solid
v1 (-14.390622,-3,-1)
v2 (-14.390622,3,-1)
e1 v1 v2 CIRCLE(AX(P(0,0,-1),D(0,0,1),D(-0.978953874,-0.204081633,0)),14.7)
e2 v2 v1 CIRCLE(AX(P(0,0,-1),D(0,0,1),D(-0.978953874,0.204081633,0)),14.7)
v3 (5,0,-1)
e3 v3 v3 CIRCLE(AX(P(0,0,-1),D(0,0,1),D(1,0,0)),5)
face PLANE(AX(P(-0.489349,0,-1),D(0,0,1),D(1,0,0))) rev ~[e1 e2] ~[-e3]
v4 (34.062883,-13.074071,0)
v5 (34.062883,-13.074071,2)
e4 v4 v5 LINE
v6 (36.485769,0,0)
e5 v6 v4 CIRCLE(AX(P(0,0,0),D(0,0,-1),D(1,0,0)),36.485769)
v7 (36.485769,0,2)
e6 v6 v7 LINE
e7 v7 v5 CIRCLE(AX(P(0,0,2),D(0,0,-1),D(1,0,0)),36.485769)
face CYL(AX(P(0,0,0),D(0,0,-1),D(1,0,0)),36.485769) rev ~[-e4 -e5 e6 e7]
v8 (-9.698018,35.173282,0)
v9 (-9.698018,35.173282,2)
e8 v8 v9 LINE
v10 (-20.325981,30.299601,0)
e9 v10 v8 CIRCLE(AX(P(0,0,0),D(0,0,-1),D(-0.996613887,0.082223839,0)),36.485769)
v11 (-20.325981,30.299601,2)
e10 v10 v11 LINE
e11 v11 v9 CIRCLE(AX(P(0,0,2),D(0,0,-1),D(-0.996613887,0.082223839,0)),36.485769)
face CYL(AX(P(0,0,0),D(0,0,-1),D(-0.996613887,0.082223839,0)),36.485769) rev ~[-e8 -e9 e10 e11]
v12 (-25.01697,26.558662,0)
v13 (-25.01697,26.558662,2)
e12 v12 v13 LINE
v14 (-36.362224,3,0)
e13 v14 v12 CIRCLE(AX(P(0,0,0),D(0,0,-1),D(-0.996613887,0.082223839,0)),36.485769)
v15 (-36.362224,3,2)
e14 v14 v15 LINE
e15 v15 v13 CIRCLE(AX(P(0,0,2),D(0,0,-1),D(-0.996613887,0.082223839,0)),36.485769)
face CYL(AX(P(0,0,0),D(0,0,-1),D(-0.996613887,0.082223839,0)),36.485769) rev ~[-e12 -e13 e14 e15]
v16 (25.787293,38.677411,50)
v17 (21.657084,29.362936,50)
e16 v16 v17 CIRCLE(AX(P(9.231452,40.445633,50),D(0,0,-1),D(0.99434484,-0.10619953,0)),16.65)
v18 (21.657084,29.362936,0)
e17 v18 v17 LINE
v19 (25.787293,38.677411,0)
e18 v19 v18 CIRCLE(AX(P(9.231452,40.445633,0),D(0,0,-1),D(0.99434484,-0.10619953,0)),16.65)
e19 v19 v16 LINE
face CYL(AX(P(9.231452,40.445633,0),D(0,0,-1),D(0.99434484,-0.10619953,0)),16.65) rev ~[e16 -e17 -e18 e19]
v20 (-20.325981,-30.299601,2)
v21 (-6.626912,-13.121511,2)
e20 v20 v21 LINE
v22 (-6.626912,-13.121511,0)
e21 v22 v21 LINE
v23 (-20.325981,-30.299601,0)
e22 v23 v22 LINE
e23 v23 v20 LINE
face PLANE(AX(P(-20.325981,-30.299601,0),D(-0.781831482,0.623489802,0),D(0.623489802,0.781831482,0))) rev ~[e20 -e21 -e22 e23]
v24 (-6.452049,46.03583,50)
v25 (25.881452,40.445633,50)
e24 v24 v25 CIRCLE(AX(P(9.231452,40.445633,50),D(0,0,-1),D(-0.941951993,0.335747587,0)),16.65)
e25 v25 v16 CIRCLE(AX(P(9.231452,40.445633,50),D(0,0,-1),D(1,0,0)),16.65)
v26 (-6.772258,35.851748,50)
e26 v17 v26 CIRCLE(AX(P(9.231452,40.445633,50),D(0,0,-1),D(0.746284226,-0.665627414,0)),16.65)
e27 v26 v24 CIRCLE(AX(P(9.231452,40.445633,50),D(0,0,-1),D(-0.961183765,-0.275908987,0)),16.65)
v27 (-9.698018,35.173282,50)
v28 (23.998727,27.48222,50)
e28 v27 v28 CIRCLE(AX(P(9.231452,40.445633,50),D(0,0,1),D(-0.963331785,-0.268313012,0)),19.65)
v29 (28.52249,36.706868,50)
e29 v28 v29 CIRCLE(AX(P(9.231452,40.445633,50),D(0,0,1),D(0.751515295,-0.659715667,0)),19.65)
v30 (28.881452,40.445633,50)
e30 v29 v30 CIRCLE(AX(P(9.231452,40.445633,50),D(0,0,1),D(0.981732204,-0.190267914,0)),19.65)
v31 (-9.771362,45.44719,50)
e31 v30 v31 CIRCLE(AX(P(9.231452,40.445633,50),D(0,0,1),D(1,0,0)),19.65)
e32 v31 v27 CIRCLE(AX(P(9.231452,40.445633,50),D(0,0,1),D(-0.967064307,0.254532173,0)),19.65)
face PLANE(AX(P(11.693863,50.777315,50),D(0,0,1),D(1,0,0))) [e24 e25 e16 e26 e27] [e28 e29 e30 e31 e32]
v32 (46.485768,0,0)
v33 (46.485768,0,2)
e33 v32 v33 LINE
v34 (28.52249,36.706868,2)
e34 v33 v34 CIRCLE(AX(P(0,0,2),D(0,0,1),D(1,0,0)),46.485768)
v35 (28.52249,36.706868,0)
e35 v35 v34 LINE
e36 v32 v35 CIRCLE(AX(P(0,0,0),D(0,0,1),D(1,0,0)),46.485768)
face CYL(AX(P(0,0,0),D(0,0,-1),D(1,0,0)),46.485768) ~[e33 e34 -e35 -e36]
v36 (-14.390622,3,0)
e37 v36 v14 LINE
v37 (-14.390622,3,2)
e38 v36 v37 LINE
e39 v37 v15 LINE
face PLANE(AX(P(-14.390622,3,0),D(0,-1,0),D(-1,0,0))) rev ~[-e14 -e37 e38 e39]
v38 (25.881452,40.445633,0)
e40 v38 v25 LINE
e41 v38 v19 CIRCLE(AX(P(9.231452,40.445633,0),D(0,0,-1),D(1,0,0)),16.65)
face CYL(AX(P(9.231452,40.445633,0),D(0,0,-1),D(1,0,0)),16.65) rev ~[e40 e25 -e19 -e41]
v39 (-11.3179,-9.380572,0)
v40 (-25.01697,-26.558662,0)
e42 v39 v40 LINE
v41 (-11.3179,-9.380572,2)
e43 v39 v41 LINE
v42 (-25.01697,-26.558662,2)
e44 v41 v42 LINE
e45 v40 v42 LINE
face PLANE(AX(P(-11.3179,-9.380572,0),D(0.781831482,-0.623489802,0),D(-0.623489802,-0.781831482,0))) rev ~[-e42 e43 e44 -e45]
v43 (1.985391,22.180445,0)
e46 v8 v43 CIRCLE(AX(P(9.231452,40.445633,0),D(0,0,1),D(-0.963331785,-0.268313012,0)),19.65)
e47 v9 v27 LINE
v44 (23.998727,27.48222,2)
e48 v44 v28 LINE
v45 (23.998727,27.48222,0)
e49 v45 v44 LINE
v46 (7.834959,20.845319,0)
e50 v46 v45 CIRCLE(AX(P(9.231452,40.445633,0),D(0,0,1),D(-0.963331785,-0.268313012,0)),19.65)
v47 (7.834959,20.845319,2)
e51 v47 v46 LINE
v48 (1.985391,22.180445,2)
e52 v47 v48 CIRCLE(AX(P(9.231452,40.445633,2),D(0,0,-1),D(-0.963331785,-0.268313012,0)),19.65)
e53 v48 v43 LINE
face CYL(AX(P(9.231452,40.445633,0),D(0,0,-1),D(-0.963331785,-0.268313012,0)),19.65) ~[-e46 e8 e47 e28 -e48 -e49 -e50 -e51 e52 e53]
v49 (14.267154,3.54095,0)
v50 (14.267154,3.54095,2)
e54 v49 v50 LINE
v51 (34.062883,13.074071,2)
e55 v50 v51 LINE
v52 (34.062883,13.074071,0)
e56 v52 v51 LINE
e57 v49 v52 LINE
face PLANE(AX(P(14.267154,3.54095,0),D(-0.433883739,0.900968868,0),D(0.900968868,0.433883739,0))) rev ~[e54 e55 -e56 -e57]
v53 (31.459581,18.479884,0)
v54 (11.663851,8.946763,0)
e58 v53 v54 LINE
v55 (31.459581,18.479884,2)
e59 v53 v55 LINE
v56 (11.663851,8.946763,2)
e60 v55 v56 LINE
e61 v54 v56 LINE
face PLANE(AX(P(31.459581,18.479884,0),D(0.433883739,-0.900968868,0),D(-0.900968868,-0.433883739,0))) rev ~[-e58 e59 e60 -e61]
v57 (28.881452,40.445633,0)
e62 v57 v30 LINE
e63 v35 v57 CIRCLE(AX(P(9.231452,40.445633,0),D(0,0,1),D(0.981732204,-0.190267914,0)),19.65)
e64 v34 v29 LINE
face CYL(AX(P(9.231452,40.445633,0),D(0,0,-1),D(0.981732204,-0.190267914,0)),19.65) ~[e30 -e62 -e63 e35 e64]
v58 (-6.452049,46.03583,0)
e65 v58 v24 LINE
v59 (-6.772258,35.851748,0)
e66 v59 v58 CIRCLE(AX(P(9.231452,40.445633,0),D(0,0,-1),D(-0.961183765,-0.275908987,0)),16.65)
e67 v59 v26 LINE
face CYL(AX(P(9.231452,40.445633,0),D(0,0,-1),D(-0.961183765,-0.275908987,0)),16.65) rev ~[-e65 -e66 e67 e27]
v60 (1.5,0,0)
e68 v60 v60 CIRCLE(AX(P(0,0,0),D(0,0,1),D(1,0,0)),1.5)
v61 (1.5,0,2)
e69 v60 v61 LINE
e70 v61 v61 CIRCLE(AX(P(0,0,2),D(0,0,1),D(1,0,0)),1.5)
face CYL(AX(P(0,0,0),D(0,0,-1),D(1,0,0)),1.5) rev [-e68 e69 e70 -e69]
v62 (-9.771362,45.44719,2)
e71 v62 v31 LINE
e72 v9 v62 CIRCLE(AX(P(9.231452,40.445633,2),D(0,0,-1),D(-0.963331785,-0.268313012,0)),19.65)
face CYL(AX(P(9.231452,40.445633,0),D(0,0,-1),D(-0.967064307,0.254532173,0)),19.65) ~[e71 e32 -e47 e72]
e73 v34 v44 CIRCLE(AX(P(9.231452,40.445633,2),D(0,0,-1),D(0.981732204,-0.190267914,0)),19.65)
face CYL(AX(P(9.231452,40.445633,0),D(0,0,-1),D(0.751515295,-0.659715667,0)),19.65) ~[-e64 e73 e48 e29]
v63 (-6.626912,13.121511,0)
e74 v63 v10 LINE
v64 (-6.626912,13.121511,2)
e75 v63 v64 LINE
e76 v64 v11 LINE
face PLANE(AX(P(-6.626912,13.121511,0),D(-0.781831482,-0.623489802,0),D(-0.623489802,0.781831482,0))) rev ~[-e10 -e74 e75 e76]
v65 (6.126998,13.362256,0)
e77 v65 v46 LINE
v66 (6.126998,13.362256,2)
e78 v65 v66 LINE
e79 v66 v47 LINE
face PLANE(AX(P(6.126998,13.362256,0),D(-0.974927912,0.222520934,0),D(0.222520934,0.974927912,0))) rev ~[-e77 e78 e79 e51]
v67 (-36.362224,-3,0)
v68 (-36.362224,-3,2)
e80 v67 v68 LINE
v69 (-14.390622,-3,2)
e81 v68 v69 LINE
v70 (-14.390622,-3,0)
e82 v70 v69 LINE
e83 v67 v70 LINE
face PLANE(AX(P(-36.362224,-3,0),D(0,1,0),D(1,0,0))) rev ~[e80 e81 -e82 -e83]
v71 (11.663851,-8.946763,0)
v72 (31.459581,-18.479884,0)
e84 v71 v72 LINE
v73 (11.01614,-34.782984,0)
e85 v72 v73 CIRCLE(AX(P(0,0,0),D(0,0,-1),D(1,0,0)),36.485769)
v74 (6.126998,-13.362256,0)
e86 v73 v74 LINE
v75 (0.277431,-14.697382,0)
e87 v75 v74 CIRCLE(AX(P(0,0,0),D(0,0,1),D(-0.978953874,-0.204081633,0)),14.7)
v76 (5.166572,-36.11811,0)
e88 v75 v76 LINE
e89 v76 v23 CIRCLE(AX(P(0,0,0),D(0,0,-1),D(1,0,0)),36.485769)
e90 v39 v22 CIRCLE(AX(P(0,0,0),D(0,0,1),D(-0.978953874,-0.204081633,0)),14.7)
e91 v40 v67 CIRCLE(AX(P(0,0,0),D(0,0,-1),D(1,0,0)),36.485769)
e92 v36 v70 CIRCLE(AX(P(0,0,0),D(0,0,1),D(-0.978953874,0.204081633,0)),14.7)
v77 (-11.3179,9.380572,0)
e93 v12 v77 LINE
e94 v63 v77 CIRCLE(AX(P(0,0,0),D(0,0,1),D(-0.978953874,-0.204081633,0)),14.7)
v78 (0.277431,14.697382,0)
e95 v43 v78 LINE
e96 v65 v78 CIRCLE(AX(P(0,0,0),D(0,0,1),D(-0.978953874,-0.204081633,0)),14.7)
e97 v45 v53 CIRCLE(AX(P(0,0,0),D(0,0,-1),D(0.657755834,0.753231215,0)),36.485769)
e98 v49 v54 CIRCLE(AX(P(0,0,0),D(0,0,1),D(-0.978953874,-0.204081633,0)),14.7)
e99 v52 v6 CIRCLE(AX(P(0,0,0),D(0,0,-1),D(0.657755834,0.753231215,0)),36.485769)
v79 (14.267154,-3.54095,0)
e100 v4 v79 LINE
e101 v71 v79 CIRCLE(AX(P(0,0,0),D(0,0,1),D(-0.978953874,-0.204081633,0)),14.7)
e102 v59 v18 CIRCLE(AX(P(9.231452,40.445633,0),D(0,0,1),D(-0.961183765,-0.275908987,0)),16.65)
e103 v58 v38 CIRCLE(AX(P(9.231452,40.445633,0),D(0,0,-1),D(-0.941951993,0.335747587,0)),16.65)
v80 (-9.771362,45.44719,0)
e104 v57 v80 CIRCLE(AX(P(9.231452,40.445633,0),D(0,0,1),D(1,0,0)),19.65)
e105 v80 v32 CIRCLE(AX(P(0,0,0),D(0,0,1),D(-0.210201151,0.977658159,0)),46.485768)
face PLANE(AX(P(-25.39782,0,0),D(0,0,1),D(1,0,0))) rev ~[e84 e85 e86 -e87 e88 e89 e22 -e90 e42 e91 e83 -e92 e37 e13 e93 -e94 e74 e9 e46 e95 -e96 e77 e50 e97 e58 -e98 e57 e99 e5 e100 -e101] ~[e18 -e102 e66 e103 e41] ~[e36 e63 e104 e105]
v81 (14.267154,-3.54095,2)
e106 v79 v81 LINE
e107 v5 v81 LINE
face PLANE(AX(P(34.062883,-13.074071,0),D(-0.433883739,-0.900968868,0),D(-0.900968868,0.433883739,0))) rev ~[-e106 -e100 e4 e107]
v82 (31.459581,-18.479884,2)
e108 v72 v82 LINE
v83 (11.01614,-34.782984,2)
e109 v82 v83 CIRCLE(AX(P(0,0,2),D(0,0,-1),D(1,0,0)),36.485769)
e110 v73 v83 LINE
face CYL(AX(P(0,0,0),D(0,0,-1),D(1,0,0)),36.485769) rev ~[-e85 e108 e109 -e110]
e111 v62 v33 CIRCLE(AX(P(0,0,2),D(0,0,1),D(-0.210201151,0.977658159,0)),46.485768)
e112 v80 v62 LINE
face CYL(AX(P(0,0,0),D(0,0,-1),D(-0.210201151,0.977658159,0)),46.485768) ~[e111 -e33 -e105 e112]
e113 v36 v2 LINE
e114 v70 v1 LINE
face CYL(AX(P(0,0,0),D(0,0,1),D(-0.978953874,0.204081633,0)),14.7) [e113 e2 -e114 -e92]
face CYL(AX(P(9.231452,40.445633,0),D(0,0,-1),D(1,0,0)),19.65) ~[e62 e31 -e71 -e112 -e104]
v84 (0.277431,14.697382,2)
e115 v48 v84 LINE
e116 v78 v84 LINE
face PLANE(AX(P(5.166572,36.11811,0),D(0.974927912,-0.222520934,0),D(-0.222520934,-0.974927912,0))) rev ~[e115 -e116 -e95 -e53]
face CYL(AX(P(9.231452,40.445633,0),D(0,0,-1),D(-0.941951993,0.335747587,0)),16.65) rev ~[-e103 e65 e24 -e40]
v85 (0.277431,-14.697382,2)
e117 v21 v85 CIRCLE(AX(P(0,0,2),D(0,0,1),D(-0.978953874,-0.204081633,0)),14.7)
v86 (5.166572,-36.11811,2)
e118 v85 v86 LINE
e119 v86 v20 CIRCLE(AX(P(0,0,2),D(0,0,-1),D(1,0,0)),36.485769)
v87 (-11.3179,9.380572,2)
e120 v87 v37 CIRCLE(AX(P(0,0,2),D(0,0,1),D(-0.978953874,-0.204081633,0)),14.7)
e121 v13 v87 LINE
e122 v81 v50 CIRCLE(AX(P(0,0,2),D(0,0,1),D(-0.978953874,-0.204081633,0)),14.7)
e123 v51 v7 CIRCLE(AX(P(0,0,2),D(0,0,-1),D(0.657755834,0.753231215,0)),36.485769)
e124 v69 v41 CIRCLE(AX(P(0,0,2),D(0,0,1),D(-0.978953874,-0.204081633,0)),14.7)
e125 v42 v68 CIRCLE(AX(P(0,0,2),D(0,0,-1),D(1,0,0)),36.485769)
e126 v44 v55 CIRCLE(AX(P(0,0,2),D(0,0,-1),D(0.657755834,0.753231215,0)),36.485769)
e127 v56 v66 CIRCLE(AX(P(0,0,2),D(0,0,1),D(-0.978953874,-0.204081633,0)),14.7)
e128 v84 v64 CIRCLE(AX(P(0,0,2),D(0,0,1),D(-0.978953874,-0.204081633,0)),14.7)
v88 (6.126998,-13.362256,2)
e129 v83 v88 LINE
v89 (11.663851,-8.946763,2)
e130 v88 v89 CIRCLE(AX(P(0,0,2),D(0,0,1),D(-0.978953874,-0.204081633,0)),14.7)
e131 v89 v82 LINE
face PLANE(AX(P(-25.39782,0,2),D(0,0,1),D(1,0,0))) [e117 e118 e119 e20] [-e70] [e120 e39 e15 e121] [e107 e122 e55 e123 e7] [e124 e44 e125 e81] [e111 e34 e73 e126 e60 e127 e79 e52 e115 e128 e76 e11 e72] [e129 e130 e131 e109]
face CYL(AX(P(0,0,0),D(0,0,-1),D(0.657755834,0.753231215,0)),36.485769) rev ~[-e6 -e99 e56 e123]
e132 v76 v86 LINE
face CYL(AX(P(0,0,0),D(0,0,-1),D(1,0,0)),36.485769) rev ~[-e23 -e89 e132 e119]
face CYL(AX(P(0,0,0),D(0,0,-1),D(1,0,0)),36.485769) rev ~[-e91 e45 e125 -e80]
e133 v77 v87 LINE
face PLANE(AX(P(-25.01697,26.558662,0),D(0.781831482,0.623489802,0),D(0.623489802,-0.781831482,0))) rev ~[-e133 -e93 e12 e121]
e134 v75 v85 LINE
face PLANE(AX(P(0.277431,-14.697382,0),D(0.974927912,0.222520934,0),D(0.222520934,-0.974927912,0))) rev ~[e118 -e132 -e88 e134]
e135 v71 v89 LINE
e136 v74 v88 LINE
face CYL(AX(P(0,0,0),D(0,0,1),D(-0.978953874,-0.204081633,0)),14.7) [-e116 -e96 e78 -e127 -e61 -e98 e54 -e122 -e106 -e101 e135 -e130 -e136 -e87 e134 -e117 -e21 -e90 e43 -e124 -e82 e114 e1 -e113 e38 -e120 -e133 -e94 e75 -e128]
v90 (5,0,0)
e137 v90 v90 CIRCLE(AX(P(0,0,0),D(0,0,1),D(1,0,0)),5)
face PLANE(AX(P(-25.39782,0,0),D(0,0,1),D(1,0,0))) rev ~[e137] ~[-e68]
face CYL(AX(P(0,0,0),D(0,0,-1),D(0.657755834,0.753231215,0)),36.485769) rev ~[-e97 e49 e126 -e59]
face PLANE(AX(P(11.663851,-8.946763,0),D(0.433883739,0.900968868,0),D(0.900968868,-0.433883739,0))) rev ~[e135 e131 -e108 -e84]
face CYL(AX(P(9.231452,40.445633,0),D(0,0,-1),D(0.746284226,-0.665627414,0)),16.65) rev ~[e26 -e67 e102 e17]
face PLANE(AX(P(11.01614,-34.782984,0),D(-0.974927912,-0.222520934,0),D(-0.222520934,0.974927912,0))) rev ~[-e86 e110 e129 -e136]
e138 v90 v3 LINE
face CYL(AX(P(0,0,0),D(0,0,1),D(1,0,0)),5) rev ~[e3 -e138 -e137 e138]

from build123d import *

# Parameters (mm, degrees)
F1_DEPTH = 2
F0_R     = 5
F0_R_2   = 1.5
F2_DEPTH = 2
F3_COUNT = 7
F4_DEPTH = 25
F5_DEPTH = 50
F6_DEPTH = 1


with BuildPart() as f1:
    # F0 (on Top) → F1 (new body)
    with BuildSketch(Plane.XY):
        with BuildLine():
            ThreePointArc((-9.6980178026, 35.1732821843), (-10.4180475342, 40.3053577212), (-9.7713618559, 45.4471900565))
            ThreePointArc((-9.7713618559, 45.4471900565), (-29.212132235, -36.1604469944), (46.4857676773, 0))
            ThreePointArc((46.4857676773, 0), (41.7541400396, 20.4332666527), (28.5224895833, 36.7068683562))
            ThreePointArc((28.5224895833, 36.7068683562), (26.8741758072, 31.793651098), (23.9987273116, 27.4822200037))
            ThreePointArc((23.9987273116, 27.4822200037), (33.217640994, 15.0930333501), (36.4857688546, 0))
            ThreePointArc((36.4857688546, 0), (1.5012714069, -36.4548695386), (-36.3622239269, -3))
            ThreePointArc((-36.3622239269, -3), (-36.4857688546, 0), (-36.3622239269, 3))
            ThreePointArc((-36.3622239269, 3), (-28.0921072309, 23.2818564603), (-9.6980178026, 35.1732821843))
        make_face()
    extrude(amount=F1_DEPTH)



with BuildPart() as f1b:
    # F0 (on Top) → F1, piece 2 (new body)
    with BuildSketch(Plane.XY):
        with BuildLine():
            ThreePointArc((14.7, 0), (1.5079551369, 14.6224509336), (-14.3906219463, 3))
            ThreePointArc((-14.3906219463, 3), (-14.7, 0), (-14.3906219463, -3))
            ThreePointArc((-14.3906219463, -3), (1.5079551369, -14.6224509336), (14.7, 0))
        make_face()
        Circle(F0_R, mode=Mode.SUBTRACT)
        Circle(F0_R)
        Circle(F0_R_2, mode=Mode.SUBTRACT)
    extrude(amount=F1_DEPTH)


with BuildPart() as f2:
    # F0 (on Top) → F2 (new body)
    with BuildSketch(Plane.XY):
        with BuildLine():
            Line((-14.3906219463, 3), (-36.3622239269, 3))
            ThreePointArc((-36.3622239269, 3), (-36.4857688546, 0), (-36.3622239269, -3))
            Line((-36.3622239269, -3), (-14.3906219463, -3))
            ThreePointArc((-14.3906219463, -3), (-14.7, 0), (-14.3906219463, 3))
        make_face()
    extrude(amount=F2_DEPTH)


with BuildPart() as f1_1:
    add(f1.part)

    add(f1b.part)  # F3 merges F1b
    # F3: F2 ×7 about axis
    f3_axis = Axis((0, 0, 2), (0, 0, -1))
    for i in range(1, F3_COUNT):
        add(f2.part.rotate(f3_axis, i * 360 / F3_COUNT))

    # F0 (on Top) → F4 (cut)
    with BuildSketch(Plane.XY):
        with BuildLine():
            ThreePointArc((21.6570841341, 29.3629364288), (8.1188473616, 35.5709944538), (-6.7722579251, 35.851748235))
            ThreePointArc((-6.7722579251, 35.851748235), (5.5264782191, 24.2130831291), (21.6570841341, 29.3629364288))
        make_face()
    extrude(amount=F4_DEPTH, mode=Mode.SUBTRACT)

    # F0 (on Top) → F5 (join)
    with BuildSketch(Plane.XY):
        with BuildLine():
            ThreePointArc((-6.4520489204, 46.03583019), (12.0680177843, 56.8522288954), (25.8814517695, 40.4456328669))
            ThreePointArc((25.8814517695, 40.4456328669), (25.8578955004, 39.5602691783), (25.7872933477, 38.6774106986))
            ThreePointArc((25.7872933477, 38.6774106986), (27.1727600693, 37.7169419064), (28.5224895833, 36.7068683562))
            ThreePointArc((28.5224895833, 36.7068683562), (28.7915053614, 38.5676543049), (28.8814517695, 40.4456328669))
            ThreePointArc((28.8814517695, 40.4456328669), (11.7530794444, 59.9331646211), (-9.7713618559, 45.4471900565))
            ThreePointArc((-9.7713618559, 45.4471900565), (-8.117043095, 45.7716091911), (-6.4520489204, 46.03583019))
        make_face()
        with BuildLine():
            ThreePointArc((-6.7722579251, 35.851748235), (-7.4103241816, 40.9688853837), (-6.4520489204, 46.03583019))
            ThreePointArc((-6.4520489204, 46.03583019), (-8.117043095, 45.7716091911), (-9.7713618559, 45.4471900565))
            ThreePointArc((-9.7713618559, 45.4471900565), (-10.4180475342, 40.3053577212), (-9.6980178026, 35.1732821843))
            ThreePointArc((-9.6980178026, 35.1732821843), (-8.2421219769, 35.5426329108), (-6.7722579251, 35.851748235))
        make_face()
        with BuildLine():
            ThreePointArc((28.5224895833, 36.7068683562), (27.1727600693, 37.7169419064), (25.7872933477, 38.6774106986))
            ThreePointArc((25.7872933477, 38.6774106986), (24.4522045664, 33.6964711194), (21.6570841341, 29.3629364288))
            ThreePointArc((21.6570841341, 29.3629364288), (22.8472657721, 28.4466830343), (23.9987273116, 27.4822200037))
            ThreePointArc((23.9987273116, 27.4822200037), (26.8741758072, 31.793651098), (28.5224895833, 36.7068683562))
        make_face()
        with BuildLine():
            ThreePointArc((21.6570841341, 29.3629364288), (5.5264782191, 24.2130831291), (-6.7722579251, 35.851748235))
            ThreePointArc((-6.7722579251, 35.851748235), (-8.2421219769, 35.5426329108), (-9.6980178026, 35.1732821843))
            ThreePointArc((-9.6980178026, 35.1732821843), (4.8589154172, 21.2882993925), (23.9987273116, 27.4822200037))
            ThreePointArc((23.9987273116, 27.4822200037), (22.8472657721, 28.4466830343), (21.6570841341, 29.3629364288))
        make_face()
    extrude(amount=F5_DEPTH)


    add(f2.part)  # F6 merges F2
    # F0 (on Top) → F6 (join)
    with BuildSketch(Plane.XY):
        with BuildLine():
            ThreePointArc((14.7, 0), (1.5079551369, 14.6224509336), (-14.3906219463, 3))
            ThreePointArc((-14.3906219463, 3), (-14.7, 0), (-14.3906219463, -3))
            ThreePointArc((-14.3906219463, -3), (1.5079551369, -14.6224509336), (14.7, 0))
        make_face()
        Circle(F0_R, mode=Mode.SUBTRACT)
    extrude(amount=-F6_DEPTH)


solid = f1_1.part
